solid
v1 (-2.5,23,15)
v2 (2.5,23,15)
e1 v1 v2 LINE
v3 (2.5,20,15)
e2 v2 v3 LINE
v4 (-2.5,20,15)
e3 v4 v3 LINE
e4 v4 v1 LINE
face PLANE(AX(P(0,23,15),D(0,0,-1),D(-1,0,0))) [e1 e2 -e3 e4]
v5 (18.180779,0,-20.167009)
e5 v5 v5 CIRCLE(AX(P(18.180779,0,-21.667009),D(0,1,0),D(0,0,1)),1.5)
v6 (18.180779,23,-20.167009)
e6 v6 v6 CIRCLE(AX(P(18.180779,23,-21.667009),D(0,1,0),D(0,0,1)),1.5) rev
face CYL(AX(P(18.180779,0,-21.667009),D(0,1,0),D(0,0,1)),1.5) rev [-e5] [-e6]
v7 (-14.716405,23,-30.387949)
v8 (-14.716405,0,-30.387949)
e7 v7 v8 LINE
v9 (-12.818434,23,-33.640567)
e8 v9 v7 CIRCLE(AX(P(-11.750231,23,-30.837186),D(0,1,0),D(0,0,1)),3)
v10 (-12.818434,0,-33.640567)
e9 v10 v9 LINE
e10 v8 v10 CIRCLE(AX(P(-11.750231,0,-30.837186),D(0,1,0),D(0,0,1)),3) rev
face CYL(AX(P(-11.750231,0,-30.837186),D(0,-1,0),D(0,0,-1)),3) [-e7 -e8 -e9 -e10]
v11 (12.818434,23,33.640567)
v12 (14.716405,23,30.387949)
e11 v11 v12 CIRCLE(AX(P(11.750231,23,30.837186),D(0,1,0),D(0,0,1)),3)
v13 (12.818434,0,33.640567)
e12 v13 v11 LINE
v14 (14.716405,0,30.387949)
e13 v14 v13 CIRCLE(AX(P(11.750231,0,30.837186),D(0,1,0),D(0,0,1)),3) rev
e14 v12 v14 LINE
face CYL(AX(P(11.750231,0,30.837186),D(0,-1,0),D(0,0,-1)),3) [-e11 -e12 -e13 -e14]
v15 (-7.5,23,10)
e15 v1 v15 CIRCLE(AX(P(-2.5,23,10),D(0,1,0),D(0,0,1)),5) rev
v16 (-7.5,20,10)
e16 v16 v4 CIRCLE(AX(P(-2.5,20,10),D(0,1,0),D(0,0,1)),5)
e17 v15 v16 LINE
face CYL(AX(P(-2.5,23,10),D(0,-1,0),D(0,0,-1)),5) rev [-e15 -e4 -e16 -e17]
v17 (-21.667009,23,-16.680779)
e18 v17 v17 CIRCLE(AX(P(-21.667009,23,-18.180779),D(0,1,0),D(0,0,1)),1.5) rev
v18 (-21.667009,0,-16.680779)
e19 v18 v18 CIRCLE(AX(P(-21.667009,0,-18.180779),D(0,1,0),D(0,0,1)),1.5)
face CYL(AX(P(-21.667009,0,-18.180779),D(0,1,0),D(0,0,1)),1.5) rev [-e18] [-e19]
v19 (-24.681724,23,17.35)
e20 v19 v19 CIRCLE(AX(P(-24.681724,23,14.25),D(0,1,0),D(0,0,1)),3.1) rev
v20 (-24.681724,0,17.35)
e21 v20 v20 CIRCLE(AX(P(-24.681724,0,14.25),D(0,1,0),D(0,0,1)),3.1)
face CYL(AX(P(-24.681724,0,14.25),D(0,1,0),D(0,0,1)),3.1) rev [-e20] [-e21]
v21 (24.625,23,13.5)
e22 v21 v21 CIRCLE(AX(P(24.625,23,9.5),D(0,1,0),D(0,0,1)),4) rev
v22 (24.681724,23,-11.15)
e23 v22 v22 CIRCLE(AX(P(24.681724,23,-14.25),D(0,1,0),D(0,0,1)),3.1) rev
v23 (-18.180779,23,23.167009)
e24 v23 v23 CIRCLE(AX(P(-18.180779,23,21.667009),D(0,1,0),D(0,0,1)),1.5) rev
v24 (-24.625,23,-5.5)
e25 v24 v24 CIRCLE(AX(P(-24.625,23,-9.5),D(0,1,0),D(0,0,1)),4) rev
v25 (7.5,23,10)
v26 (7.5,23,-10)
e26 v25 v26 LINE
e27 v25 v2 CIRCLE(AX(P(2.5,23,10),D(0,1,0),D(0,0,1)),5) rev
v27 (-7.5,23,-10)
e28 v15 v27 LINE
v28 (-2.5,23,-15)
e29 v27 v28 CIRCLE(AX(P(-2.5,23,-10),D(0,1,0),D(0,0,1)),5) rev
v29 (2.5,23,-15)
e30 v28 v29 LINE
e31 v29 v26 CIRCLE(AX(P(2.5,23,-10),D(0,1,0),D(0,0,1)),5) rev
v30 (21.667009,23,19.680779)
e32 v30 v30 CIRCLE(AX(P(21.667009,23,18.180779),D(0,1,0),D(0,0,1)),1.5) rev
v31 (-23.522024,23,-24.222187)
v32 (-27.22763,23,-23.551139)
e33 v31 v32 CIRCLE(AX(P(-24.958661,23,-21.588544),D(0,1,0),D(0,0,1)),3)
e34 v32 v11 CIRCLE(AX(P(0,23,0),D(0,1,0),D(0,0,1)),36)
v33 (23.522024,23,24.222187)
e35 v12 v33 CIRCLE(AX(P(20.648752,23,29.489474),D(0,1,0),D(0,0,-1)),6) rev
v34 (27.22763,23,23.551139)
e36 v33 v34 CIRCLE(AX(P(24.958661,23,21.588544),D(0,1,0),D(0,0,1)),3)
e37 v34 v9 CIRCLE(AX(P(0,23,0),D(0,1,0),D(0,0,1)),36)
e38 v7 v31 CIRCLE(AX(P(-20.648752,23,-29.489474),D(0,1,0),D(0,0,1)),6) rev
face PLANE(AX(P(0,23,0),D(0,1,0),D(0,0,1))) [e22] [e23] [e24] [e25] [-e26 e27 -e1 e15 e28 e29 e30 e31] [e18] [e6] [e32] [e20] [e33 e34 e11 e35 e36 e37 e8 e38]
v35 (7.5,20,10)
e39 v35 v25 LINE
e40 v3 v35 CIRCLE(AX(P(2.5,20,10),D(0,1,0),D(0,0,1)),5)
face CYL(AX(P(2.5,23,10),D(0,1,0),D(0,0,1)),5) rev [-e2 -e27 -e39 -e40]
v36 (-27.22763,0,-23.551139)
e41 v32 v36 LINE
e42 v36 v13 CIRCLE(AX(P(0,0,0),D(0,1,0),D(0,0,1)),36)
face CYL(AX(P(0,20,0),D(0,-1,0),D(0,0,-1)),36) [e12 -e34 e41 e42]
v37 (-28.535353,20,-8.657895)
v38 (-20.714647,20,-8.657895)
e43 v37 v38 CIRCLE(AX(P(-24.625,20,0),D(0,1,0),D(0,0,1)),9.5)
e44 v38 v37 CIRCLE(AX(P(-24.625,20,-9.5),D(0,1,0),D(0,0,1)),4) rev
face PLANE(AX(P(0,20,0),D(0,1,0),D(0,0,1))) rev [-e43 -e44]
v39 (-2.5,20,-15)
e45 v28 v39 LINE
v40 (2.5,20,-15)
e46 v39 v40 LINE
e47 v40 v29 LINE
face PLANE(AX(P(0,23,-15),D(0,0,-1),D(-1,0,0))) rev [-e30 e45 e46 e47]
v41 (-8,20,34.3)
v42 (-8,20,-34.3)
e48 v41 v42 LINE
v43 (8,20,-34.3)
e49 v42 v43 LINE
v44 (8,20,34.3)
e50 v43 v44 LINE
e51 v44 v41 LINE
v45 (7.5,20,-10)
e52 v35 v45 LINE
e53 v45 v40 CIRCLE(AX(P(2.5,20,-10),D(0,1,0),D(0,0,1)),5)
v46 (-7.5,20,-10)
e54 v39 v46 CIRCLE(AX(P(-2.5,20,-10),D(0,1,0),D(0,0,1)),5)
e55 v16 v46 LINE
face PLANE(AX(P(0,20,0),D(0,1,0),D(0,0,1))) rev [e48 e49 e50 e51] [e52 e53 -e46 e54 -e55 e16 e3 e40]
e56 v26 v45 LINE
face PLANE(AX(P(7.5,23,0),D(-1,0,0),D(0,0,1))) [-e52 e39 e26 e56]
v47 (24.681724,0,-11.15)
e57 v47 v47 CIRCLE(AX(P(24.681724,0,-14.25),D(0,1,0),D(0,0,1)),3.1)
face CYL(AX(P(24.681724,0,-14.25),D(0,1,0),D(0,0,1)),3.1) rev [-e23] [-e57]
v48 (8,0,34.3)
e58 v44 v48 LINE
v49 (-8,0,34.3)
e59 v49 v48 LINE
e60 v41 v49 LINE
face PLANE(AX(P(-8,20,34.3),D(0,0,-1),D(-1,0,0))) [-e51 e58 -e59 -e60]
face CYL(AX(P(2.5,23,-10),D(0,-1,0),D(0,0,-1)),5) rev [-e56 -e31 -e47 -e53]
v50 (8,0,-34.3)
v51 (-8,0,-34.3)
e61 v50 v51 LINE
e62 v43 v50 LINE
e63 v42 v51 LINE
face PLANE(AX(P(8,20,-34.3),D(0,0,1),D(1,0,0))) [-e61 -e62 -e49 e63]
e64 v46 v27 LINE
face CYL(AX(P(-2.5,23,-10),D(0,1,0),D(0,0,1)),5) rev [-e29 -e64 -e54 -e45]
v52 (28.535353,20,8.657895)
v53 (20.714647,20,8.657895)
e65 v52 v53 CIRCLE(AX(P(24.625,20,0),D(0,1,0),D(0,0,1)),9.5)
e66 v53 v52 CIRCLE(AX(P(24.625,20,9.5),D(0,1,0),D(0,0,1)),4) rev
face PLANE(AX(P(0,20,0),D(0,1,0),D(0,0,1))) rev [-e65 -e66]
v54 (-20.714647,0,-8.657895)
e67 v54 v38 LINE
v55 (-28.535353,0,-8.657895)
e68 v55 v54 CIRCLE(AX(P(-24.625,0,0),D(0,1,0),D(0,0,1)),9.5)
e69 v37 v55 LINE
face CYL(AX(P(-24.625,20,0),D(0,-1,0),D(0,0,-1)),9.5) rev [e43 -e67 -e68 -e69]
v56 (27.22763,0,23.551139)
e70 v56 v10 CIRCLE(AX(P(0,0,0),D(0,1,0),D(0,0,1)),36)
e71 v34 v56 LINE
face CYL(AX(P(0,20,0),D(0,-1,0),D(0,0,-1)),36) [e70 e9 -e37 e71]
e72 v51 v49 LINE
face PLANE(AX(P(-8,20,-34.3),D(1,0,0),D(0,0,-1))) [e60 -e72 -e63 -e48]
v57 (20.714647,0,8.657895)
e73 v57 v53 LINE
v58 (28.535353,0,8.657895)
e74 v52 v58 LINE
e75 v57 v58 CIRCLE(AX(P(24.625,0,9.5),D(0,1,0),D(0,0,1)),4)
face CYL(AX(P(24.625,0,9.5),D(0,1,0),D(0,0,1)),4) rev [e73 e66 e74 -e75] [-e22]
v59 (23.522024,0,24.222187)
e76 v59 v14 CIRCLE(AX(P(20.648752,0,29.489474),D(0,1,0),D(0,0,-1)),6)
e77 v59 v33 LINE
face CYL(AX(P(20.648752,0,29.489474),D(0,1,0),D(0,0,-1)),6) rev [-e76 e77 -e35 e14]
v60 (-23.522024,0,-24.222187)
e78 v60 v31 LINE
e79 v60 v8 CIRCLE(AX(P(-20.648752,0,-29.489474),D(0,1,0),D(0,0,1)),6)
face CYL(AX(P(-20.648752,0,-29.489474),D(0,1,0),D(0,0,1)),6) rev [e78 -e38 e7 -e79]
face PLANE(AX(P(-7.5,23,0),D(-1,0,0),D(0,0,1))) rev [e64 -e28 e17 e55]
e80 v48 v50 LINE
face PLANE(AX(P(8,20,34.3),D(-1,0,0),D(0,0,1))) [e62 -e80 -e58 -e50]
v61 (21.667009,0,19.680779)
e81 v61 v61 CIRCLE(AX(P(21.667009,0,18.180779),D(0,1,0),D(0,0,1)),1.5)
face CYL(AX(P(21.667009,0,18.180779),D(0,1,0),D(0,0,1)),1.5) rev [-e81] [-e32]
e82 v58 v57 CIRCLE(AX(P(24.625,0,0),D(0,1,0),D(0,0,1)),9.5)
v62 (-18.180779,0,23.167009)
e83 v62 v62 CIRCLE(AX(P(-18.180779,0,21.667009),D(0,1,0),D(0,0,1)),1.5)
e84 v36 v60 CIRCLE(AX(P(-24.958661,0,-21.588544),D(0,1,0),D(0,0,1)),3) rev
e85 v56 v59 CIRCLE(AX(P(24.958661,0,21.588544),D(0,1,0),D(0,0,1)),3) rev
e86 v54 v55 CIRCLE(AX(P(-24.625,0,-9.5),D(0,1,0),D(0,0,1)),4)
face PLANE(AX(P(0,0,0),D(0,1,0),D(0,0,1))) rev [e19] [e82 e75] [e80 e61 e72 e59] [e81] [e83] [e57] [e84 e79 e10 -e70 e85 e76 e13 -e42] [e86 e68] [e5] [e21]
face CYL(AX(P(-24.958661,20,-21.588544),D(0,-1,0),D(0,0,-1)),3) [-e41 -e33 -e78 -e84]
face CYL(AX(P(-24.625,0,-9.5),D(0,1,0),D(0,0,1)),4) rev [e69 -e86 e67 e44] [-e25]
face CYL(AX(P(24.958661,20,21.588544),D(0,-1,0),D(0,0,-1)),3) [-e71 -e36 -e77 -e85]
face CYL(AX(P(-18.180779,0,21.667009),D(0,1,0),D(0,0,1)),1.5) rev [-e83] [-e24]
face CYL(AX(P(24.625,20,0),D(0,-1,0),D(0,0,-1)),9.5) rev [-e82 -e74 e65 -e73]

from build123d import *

# Parameters (mm, degrees)
BOSS_EXTRUDE1_OUTLINE_R   = 36
BOSS_EXTRUDE1_OUTLINE_R_2 = 9.5
BOSS_EXTRUDE1_OUTLINE_W   = 16
BOSS_EXTRUDE1_OUTLINE_H   = 68.6
BOSS_EXTRUDE1_DEPTH       = 20
SKETCH4_R                 = 3.999999999999999
CUT_EXTRUDE6_DEPTH        = 55.699177324709375
SKETCH5_R                 = 1.5000000000000009
CUT_EXTRUDE2_DEPTH        = 20
CUT_EXTRUDE4_DEPTH        = 55.699177324709375
CUT_EXTRUDE4_DEPTH_BACK   = 55.699177324709375
SKETCH6_R                 = 3.0999999999999988
CUT_EXTRUDE5_DEPTH        = 55.699177324709375
CUT_EXTRUDE5_DEPTH_BACK   = 55.699177324709375
BOSS_EXTRUDE2_OUTLINE_R   = 1.5
BOSS_EXTRUDE2_OUTLINE_R_2 = 3.1
BOSS_EXTRUDE2_OUTLINE_W   = 16
BOSS_EXTRUDE2_OUTLINE_H   = 68.6
BOSS_EXTRUDE2_OUTLINE_R_3 = 4
BOSS_EXTRUDE2_DEPTH       = 3
SKETCH9_3_W               = 16
SKETCH9_3_H               = 68.6
SKETCH9_3_W_2             = 15
SKETCH9_3_H_2             = 30
BOSS_EXTRUDE3_DEPTH       = 3
CIRPATTERN1_DEPTH         = 23
FILLET1_R                 = 5
FILLET2_R                 = 3


# Read off the part's stored shape, not the designer's step: Boss-Extrude1, Boss-Extrude2, CirPattern1
with BuildPart() as part:
    # Boss-Extrude1 outline → Boss-Extrude1 (new body)
    with BuildSketch(Plane(origin=(0, 0, 0), x_dir=(1, 0, 0), z_dir=(0, 1, 0))):
        Circle(BOSS_EXTRUDE1_OUTLINE_R)
        with Locations((-24.625, 0)):
            Circle(BOSS_EXTRUDE1_OUTLINE_R_2, mode=Mode.SUBTRACT)
        Rectangle(BOSS_EXTRUDE1_OUTLINE_W, BOSS_EXTRUDE1_OUTLINE_H, mode=Mode.SUBTRACT)
        with Locations((24.625, 0)):
            Circle(BOSS_EXTRUDE1_OUTLINE_R_2, mode=Mode.SUBTRACT)
    extrude(amount=BOSS_EXTRUDE1_DEPTH)

    # Sketch4 → Cut-Extrude6 (cut, through all)
    with BuildSketch(Plane(origin=(0, 20, 0), x_dir=(1, 0, 0), z_dir=(0, 1, 0))):
        with Locations((-24.625, 9.500000000000002)):
            Circle(SKETCH4_R)
        with Locations((24.625, -9.500000000000002)):
            Circle(SKETCH4_R)
    extrude(amount=-CUT_EXTRUDE6_DEPTH, mode=Mode.SUBTRACT)

    # Sketch5 → Cut-Extrude2 (cut)
    with BuildSketch(Plane(origin=(0, 20, 0), x_dir=(1, 0, 0), z_dir=(0, 1, 0))):
        with Locations(Location((-21.667008816788154, 18.18077910688168, 0), (0, 0, 270))):
            Circle(SKETCH5_R)
        with Locations(Location((18.180779106881676, 21.667008816788137, 0), (0, 0, 270))):
            Circle(SKETCH5_R)
        with Locations(Location((-18.18077910688169, -21.66700881678815, 0), (0, 0, 270))):
            Circle(SKETCH5_R)
        with Locations(Location((21.667008816788147, -18.180779106881687, 0), (0, 0, 270))):
            Circle(SKETCH5_R)
    extrude(amount=-CUT_EXTRUDE2_DEPTH, mode=Mode.SUBTRACT)

    # Sketch6 → Cut-Extrude4 (cut, two sides: drawn at the far end of the back side and taken through both)
    with BuildSketch(Plane(origin=(0, 20, 0), x_dir=(1, 0, 0), z_dir=(0, 1, 0)).offset(-CUT_EXTRUDE4_DEPTH_BACK)):
        with Locations(Location((-24.68172400785648, -14.250000000000037, 0), (0, 0, 270))):
            Circle(SKETCH6_R)
        with Locations(Location((24.68172400785648, 14.25000000000004, 0), (0, 0, 270))):
            Circle(SKETCH6_R)
    extrude(amount=CUT_EXTRUDE4_DEPTH + CUT_EXTRUDE4_DEPTH_BACK, mode=Mode.SUBTRACT)

    # Sketch7 → Cut-Extrude5 (cut, two sides: drawn at the far end of the back side and taken through both)
    with BuildSketch(Plane(origin=(0, 20, 0), x_dir=(1, 0, 0), z_dir=(0, 1, 0)).offset(-CUT_EXTRUDE5_DEPTH_BACK)):
        with BuildLine():
            ThreePointArc((-25.25978035738815, 25.650409281266985), (-17.20729309053125, 24.574561328669844), (-15.46414662353581, 32.50938586325165))
            ThreePointArc((-15.46414662353581, 32.50938586325165), (-20.64875170863751, 29.48947359440382), (-25.25978035738815, 25.650409281266985))
        make_face()
    extrude(amount=CUT_EXTRUDE5_DEPTH + CUT_EXTRUDE5_DEPTH_BACK, mode=Mode.SUBTRACT)

    # Boss-Extrude2 outline → Boss-Extrude2 (add)
    with BuildSketch(Plane(origin=(0, 20, 0), x_dir=(1, 0, 0), z_dir=(0, 1, 0))):
        with BuildLine():
            ThreePointArc((-25.259780357, 25.650409281), (20.648751711, -29.489473593), (-15.464146624, 32.509385863))
            ThreePointArc((-15.464146624, 32.509385863), (-17.207293091, 24.574561329), (-25.259780357, 25.650409281))
        make_face()
        with Locations((-18.180779107, -21.667008817)):
            Circle(BOSS_EXTRUDE2_OUTLINE_R, mode=Mode.SUBTRACT)
        with Locations((-24.681724008, -14.25)):
            Circle(BOSS_EXTRUDE2_OUTLINE_R_2, mode=Mode.SUBTRACT)
        Rectangle(BOSS_EXTRUDE2_OUTLINE_W, BOSS_EXTRUDE2_OUTLINE_H, mode=Mode.SUBTRACT)
        with Locations((21.667008817, -18.180779107)):
            Circle(BOSS_EXTRUDE2_OUTLINE_R, mode=Mode.SUBTRACT)
        with Locations((24.625, -9.5)):
            Circle(BOSS_EXTRUDE2_OUTLINE_R_3, mode=Mode.SUBTRACT)
        with Locations((-24.625, 9.5)):
            Circle(BOSS_EXTRUDE2_OUTLINE_R_3, mode=Mode.SUBTRACT)
        with Locations((-21.667008817, 18.180779107)):
            Circle(BOSS_EXTRUDE2_OUTLINE_R, mode=Mode.SUBTRACT)
        with Locations((24.681724008, 14.25)):
            Circle(BOSS_EXTRUDE2_OUTLINE_R_2, mode=Mode.SUBTRACT)
        with Locations((18.180779107, 21.667008817)):
            Circle(BOSS_EXTRUDE2_OUTLINE_R, mode=Mode.SUBTRACT)
    extrude(amount=BOSS_EXTRUDE2_DEPTH)

    # Sketch9<3> → Boss-Extrude3 (add)
    with BuildSketch(Plane(origin=(0, 20, 0), x_dir=(1, 0, 0), z_dir=(0, 1, 0))):
        Rectangle(SKETCH9_3_W, SKETCH9_3_H)
        Rectangle(SKETCH9_3_W_2, SKETCH9_3_H_2, mode=Mode.SUBTRACT)
    extrude(amount=BOSS_EXTRUDE3_DEPTH)

    # CirPattern1 outline → CirPattern1 (cut)
    with BuildSketch(Plane(origin=(0, 0, 0), x_dir=(1, 0, 0), z_dir=(0, 1, 0))):
        with BuildLine():
            ThreePointArc((15.464146624, -32.509385863), (20.648751709, -29.489473594), (25.259780357, -25.650409281))
            ThreePointArc((25.259780357, -25.650409281), (17.207293091, -24.574561329), (15.464146624, -32.509385863))
        make_face()
    extrude(amount=CIRPATTERN1_DEPTH, mode=Mode.SUBTRACT)

    # Fillet1
    fillet1_edges = [part.edges().sort_by_distance(p)[0] for p in [
        (7.499999999999997, 21.5, -14.999999999999998),
        (7.499999999999997, 21.5, 15.000000000000002),
        (-7.500000000000003, 21.5, 15.000000000000002),
        (-7.500000000000003, 21.5, -14.999999999999998),
    ]]
    fillet(fillet1_edges, radius=FILLET1_R)

    # Fillet2
    fillet2_edges = [part.edges().sort_by_distance(p)[0] for p in [
        (25.259780357000004, 10, 25.650409281),
        (15.464146623999998, 10, 32.509385863),
        (-25.259780357388152, 10, -25.650409281266985),
        (-15.46414662353581, 10, -32.50938586325165),
    ]]
    fillet(fillet2_edges, radius=FILLET2_R)


solid = part.part
